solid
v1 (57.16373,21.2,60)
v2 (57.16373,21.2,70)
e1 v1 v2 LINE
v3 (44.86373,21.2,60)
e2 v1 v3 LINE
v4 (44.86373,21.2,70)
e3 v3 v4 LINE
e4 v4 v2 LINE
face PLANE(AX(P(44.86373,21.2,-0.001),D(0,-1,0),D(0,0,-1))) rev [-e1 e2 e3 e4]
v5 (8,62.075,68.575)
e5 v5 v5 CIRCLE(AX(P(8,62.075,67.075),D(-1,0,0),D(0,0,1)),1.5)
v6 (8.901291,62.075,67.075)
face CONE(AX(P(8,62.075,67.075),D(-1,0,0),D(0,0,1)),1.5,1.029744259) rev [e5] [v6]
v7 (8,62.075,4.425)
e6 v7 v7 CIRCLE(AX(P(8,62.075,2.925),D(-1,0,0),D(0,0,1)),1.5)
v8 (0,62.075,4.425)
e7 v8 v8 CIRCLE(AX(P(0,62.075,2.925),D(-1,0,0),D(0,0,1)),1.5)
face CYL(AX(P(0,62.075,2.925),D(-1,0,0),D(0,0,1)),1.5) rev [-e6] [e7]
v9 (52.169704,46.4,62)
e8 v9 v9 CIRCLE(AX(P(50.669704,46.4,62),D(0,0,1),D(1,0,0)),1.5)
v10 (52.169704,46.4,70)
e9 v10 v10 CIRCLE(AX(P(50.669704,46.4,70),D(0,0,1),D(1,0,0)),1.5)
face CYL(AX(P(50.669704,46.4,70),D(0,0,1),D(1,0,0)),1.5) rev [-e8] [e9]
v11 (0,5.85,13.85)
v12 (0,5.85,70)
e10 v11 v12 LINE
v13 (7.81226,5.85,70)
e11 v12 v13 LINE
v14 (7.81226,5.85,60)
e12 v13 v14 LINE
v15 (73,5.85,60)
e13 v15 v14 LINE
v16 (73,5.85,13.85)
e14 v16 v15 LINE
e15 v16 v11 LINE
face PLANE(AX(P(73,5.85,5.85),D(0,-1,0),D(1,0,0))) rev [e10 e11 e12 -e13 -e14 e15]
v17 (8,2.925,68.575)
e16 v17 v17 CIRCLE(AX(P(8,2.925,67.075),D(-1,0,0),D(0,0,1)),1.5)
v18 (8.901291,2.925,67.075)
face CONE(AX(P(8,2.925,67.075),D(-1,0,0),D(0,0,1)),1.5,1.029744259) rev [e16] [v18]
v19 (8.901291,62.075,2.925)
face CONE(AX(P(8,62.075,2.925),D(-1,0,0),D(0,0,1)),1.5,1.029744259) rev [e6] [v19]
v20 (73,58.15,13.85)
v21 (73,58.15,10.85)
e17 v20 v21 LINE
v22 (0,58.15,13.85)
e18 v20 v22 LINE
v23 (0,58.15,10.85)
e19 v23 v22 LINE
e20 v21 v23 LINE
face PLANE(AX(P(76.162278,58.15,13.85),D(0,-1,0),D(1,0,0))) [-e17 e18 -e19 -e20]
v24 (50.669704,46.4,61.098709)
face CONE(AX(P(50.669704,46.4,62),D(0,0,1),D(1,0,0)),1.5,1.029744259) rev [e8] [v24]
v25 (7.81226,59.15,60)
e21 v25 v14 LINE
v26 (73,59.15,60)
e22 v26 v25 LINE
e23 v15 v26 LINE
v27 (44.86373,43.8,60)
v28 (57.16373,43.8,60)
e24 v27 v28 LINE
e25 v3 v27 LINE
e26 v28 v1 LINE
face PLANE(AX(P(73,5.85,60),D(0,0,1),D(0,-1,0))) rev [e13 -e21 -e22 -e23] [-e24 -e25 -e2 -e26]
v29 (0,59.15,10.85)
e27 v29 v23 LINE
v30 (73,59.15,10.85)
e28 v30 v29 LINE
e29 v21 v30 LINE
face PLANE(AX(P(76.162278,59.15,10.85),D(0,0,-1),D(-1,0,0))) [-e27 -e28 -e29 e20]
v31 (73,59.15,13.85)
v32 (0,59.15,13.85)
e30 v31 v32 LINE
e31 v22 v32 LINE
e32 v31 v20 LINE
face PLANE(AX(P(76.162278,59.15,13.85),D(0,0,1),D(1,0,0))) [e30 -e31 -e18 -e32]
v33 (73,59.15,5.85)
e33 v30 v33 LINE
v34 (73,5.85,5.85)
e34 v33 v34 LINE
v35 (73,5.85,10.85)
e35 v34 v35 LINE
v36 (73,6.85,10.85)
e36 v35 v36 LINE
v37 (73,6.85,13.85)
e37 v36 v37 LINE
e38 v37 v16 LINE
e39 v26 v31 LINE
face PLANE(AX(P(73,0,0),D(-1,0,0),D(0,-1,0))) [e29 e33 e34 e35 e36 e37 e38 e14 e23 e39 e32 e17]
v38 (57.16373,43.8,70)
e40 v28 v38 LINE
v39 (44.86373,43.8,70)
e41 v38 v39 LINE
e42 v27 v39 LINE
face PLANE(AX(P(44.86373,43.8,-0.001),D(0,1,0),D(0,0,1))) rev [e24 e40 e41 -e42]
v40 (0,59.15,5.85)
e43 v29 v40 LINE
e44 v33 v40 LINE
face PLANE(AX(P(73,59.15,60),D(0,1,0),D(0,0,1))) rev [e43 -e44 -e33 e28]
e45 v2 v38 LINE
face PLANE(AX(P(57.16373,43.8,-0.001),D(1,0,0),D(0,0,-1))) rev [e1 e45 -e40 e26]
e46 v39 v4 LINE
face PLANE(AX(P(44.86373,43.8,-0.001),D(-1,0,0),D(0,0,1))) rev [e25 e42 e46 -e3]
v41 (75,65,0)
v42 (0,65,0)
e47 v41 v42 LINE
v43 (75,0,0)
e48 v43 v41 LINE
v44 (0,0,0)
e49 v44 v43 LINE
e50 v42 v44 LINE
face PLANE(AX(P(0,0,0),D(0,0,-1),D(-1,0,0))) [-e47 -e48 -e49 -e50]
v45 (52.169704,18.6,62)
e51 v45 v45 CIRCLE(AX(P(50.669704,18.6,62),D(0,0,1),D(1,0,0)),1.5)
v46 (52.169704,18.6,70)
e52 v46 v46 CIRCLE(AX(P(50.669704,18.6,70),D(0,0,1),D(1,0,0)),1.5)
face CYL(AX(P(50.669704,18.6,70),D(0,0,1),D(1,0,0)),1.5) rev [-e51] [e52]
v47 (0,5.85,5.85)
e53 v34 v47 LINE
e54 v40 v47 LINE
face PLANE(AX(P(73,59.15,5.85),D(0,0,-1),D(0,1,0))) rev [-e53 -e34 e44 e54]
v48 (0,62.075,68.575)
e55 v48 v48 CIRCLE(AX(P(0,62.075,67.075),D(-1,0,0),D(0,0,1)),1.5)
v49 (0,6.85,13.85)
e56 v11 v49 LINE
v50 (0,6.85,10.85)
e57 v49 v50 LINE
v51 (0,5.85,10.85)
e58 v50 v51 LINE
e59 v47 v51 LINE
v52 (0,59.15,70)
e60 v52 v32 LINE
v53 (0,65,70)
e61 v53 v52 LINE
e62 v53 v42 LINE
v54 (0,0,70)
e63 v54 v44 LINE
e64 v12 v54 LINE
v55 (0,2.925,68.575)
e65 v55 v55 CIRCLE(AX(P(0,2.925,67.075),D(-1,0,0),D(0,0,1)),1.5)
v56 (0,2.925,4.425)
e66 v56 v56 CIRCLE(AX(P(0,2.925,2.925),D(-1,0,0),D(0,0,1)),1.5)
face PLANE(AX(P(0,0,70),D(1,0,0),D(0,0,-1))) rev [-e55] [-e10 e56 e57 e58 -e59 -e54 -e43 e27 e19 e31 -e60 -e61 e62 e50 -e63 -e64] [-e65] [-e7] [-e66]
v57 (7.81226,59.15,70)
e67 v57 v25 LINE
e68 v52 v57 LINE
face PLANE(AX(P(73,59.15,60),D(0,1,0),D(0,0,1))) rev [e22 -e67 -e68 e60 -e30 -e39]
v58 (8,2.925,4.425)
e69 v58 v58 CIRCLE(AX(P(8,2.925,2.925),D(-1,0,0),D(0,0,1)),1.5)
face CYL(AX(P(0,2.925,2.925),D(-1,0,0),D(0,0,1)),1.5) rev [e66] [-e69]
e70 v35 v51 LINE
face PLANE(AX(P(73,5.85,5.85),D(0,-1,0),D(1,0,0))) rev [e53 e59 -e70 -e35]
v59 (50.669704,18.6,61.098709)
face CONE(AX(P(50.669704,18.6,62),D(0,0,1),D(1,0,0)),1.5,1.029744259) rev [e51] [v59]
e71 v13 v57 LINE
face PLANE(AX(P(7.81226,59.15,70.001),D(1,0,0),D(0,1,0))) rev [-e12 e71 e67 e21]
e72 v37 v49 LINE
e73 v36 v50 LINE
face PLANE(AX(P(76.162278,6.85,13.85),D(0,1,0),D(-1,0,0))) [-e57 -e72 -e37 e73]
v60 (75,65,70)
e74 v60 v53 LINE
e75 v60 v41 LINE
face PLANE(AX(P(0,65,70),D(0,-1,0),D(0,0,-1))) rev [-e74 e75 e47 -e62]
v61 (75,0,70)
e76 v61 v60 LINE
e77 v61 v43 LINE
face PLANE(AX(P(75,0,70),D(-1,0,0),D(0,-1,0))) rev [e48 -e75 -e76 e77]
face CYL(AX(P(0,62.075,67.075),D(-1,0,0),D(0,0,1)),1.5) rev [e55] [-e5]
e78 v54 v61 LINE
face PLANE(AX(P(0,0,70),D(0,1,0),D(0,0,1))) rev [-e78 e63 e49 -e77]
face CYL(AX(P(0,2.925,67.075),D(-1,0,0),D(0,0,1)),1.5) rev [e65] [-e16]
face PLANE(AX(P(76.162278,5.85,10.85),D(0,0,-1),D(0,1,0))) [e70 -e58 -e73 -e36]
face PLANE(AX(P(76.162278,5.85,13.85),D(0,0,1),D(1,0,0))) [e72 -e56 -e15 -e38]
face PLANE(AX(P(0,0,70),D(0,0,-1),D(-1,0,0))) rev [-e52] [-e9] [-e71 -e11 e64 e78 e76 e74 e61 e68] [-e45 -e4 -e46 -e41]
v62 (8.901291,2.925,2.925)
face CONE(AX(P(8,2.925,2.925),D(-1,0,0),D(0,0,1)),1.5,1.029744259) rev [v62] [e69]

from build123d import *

# Parameters (mm, degrees)
SKIZZE1_W                       = 75
SKIZZE1_H                       = 65
AUFSATZ_LINEAR_AUSTRAGEN1_DEPTH = 70
SKIZZE4_W                       = 54.15
SKIZZE4_H                       = 53.3
SCHNITT_LINEAR_AUSTRAGEN1_DEPTH = 73
SKIZZE9_W                       = 3
SKIZZE9_H                       = 1
AUFSATZ_LINEAR_AUSTRAGEN2_DEPTH = 73
SCHNITT_LINEAR_AUSTRAGEN3_REACH = 117.974
SKIZZE12_W                      = 7.812260402
SKIZZE12_H                      = 53.3
SCHNITT_LINEAR_AUSTRAGEN4_REACH = 123.45
SKIZZE15_W                      = 12.3
SKIZZE15_H                      = 22.6


# Read off the part's stored shape, not the designer's step: Ø3.0 (3) Durchmesser Bohrung1, Ø3.0 (3) Durchmesser Bohrung2
with BuildPart() as part:
    # Skizze1 → Aufsatz-Linear austragen1 (new body)
    with BuildSketch(Plane.XY):
        with Locations((37.5, 32.5)):
            Rectangle(SKIZZE1_W, SKIZZE1_H)
    extrude(amount=AUFSATZ_LINEAR_AUSTRAGEN1_DEPTH)

    # Skizze4 → Schnitt-Linear austragen1 (cut)
    with BuildSketch(Plane.ZY):
        with Locations((32.925, 32.5)):
            Rectangle(SKIZZE4_W, SKIZZE4_H)
    extrude(amount=-SCHNITT_LINEAR_AUSTRAGEN1_DEPTH, mode=Mode.SUBTRACT)

    # Skizze9 → Aufsatz-Linear austragen2 (add)
    with BuildSketch(Plane.ZY):
        with Locations((12.35, 58.65)):
            Rectangle(SKIZZE9_W, SKIZZE9_H)
        with Locations((12.35, 6.35)):
            Rectangle(SKIZZE9_W, SKIZZE9_H)
    extrude(amount=-AUFSATZ_LINEAR_AUSTRAGEN2_DEPTH)

    # Skizze12 → Schnitt-Linear austragen3 (cut, up to next)
    with BuildSketch(Plane(origin=(0, 0, 60), x_dir=(-1, 0, 0), z_dir=(0, 0, -1)), mode=Mode.PRIVATE) as schnitt_linear_austragen3_sk1:
        with Locations((-3.906130201, 32.5)):
            Rectangle(SKIZZE12_W, SKIZZE12_H)
    schnitt_linear_austragen3_tool1 = extrude(schnitt_linear_austragen3_sk1.sketch, amount=-SCHNITT_LINEAR_AUSTRAGEN3_REACH, mode=Mode.PRIVATE) & part.part
    add(schnitt_linear_austragen3_tool1.solids().sort_by_distance((3.90613, 32.5, 60))[0], mode=Mode.SUBTRACT)

    # Ø3.0 (3) Durchmesser Bohrung1 outline → Ø3.0 (3) Durchmesser Bohrung1 (revolve, cut)
    with BuildSketch(Plane(origin=(50.669703956, 18.6, 0), x_dir=(1, 0, 0), z_dir=(0, -1, 0))):
        Polygon((0, 70), (0, 61.098709071), (1.5, 62), (1.5, 70), align=None)
    revolve(axis=Axis((50.669703956, 18.6, 0), (0, 0, 1)), mode=Mode.SUBTRACT)

    # 3.0 _3_ Durchmesser Bohrung1 2 outline → 3.0 _3_ Durchmesser Bohrung1 2 (revolve, cut)
    with BuildSketch(Plane(origin=(50.669703956, 46.4, 0), x_dir=(1, 0, 0), z_dir=(0, -1, 0))):
        Polygon((0, 70), (0, 61.098709071), (1.5, 62), (1.5, 70), align=None)
    revolve(axis=Axis((50.669703956, 46.4, 0), (0, 0, 1)), mode=Mode.SUBTRACT)

    # Skizze15 → Schnitt-Linear austragen4 (cut, up to next)
    with BuildSketch(Plane.XY.offset(70), mode=Mode.PRIVATE) as schnitt_linear_austragen4_sk1:
        with Locations((51.013730389, 32.5)):
            Rectangle(SKIZZE15_W, SKIZZE15_H)
    schnitt_linear_austragen4_tool1 = extrude(schnitt_linear_austragen4_sk1.sketch, amount=-SCHNITT_LINEAR_AUSTRAGEN4_REACH, mode=Mode.PRIVATE) & part.part
    add(schnitt_linear_austragen4_tool1.solids().sort_by_distance((51.01373, 32.5, 70))[0], mode=Mode.SUBTRACT)

    # Ø3.0 (3) Durchmesser Bohrung2 outline → Ø3.0 (3) Durchmesser Bohrung2 (revolve, cut)
    with BuildSketch(Plane(origin=(0, 62.075, 2.925), x_dir=(0, 1, 0), z_dir=(0, 0, -1))):
        Polygon((1.5, 8), (0, 8.901290929), (0, 0), (1.5, 0), align=None)
    revolve(axis=Axis((0, 62.075, 2.925), (1, 0, 0)), mode=Mode.SUBTRACT)

    # 3.0 _3_ Durchmesser Bohrung2 2 outline → 3.0 _3_ Durchmesser Bohrung2 2 (revolve, cut)
    with BuildSketch(Plane(origin=(0, 2.925, 2.925), x_dir=(0, 1, 0), z_dir=(0, 0, -1))):
        Polygon((1.5, 8), (0, 8.901290929), (0, 0), (1.5, 0), align=None)
    revolve(axis=Axis((0, 2.925, 2.925), (1, 0, 0)), mode=Mode.SUBTRACT)

    # 3.0 _3_ Durchmesser Bohrung2 3 outline → 3.0 _3_ Durchmesser Bohrung2 3 (revolve, cut)
    with BuildSketch(Plane(origin=(0, 2.925, 67.075), x_dir=(0, 1, 0), z_dir=(0, 0, -1))):
        Polygon((1.5, 8), (0, 8.901290929), (0, 0), (1.5, 0), align=None)
    revolve(axis=Axis((0, 2.925, 67.075), (1, 0, 0)), mode=Mode.SUBTRACT)

    # 3.0 _3_ Durchmesser Bohrung2 4 outline → 3.0 _3_ Durchmesser Bohrung2 4 (revolve, cut)
    with BuildSketch(Plane(origin=(0, 62.075, 67.075), x_dir=(0, 1, 0), z_dir=(0, 0, -1))):
        Polygon((1.5, 8), (0, 8.901290929), (0, 0), (1.5, 0), align=None)
    revolve(axis=Axis((0, 62.075, 67.075), (1, 0, 0)), mode=Mode.SUBTRACT)


solid = part.part
